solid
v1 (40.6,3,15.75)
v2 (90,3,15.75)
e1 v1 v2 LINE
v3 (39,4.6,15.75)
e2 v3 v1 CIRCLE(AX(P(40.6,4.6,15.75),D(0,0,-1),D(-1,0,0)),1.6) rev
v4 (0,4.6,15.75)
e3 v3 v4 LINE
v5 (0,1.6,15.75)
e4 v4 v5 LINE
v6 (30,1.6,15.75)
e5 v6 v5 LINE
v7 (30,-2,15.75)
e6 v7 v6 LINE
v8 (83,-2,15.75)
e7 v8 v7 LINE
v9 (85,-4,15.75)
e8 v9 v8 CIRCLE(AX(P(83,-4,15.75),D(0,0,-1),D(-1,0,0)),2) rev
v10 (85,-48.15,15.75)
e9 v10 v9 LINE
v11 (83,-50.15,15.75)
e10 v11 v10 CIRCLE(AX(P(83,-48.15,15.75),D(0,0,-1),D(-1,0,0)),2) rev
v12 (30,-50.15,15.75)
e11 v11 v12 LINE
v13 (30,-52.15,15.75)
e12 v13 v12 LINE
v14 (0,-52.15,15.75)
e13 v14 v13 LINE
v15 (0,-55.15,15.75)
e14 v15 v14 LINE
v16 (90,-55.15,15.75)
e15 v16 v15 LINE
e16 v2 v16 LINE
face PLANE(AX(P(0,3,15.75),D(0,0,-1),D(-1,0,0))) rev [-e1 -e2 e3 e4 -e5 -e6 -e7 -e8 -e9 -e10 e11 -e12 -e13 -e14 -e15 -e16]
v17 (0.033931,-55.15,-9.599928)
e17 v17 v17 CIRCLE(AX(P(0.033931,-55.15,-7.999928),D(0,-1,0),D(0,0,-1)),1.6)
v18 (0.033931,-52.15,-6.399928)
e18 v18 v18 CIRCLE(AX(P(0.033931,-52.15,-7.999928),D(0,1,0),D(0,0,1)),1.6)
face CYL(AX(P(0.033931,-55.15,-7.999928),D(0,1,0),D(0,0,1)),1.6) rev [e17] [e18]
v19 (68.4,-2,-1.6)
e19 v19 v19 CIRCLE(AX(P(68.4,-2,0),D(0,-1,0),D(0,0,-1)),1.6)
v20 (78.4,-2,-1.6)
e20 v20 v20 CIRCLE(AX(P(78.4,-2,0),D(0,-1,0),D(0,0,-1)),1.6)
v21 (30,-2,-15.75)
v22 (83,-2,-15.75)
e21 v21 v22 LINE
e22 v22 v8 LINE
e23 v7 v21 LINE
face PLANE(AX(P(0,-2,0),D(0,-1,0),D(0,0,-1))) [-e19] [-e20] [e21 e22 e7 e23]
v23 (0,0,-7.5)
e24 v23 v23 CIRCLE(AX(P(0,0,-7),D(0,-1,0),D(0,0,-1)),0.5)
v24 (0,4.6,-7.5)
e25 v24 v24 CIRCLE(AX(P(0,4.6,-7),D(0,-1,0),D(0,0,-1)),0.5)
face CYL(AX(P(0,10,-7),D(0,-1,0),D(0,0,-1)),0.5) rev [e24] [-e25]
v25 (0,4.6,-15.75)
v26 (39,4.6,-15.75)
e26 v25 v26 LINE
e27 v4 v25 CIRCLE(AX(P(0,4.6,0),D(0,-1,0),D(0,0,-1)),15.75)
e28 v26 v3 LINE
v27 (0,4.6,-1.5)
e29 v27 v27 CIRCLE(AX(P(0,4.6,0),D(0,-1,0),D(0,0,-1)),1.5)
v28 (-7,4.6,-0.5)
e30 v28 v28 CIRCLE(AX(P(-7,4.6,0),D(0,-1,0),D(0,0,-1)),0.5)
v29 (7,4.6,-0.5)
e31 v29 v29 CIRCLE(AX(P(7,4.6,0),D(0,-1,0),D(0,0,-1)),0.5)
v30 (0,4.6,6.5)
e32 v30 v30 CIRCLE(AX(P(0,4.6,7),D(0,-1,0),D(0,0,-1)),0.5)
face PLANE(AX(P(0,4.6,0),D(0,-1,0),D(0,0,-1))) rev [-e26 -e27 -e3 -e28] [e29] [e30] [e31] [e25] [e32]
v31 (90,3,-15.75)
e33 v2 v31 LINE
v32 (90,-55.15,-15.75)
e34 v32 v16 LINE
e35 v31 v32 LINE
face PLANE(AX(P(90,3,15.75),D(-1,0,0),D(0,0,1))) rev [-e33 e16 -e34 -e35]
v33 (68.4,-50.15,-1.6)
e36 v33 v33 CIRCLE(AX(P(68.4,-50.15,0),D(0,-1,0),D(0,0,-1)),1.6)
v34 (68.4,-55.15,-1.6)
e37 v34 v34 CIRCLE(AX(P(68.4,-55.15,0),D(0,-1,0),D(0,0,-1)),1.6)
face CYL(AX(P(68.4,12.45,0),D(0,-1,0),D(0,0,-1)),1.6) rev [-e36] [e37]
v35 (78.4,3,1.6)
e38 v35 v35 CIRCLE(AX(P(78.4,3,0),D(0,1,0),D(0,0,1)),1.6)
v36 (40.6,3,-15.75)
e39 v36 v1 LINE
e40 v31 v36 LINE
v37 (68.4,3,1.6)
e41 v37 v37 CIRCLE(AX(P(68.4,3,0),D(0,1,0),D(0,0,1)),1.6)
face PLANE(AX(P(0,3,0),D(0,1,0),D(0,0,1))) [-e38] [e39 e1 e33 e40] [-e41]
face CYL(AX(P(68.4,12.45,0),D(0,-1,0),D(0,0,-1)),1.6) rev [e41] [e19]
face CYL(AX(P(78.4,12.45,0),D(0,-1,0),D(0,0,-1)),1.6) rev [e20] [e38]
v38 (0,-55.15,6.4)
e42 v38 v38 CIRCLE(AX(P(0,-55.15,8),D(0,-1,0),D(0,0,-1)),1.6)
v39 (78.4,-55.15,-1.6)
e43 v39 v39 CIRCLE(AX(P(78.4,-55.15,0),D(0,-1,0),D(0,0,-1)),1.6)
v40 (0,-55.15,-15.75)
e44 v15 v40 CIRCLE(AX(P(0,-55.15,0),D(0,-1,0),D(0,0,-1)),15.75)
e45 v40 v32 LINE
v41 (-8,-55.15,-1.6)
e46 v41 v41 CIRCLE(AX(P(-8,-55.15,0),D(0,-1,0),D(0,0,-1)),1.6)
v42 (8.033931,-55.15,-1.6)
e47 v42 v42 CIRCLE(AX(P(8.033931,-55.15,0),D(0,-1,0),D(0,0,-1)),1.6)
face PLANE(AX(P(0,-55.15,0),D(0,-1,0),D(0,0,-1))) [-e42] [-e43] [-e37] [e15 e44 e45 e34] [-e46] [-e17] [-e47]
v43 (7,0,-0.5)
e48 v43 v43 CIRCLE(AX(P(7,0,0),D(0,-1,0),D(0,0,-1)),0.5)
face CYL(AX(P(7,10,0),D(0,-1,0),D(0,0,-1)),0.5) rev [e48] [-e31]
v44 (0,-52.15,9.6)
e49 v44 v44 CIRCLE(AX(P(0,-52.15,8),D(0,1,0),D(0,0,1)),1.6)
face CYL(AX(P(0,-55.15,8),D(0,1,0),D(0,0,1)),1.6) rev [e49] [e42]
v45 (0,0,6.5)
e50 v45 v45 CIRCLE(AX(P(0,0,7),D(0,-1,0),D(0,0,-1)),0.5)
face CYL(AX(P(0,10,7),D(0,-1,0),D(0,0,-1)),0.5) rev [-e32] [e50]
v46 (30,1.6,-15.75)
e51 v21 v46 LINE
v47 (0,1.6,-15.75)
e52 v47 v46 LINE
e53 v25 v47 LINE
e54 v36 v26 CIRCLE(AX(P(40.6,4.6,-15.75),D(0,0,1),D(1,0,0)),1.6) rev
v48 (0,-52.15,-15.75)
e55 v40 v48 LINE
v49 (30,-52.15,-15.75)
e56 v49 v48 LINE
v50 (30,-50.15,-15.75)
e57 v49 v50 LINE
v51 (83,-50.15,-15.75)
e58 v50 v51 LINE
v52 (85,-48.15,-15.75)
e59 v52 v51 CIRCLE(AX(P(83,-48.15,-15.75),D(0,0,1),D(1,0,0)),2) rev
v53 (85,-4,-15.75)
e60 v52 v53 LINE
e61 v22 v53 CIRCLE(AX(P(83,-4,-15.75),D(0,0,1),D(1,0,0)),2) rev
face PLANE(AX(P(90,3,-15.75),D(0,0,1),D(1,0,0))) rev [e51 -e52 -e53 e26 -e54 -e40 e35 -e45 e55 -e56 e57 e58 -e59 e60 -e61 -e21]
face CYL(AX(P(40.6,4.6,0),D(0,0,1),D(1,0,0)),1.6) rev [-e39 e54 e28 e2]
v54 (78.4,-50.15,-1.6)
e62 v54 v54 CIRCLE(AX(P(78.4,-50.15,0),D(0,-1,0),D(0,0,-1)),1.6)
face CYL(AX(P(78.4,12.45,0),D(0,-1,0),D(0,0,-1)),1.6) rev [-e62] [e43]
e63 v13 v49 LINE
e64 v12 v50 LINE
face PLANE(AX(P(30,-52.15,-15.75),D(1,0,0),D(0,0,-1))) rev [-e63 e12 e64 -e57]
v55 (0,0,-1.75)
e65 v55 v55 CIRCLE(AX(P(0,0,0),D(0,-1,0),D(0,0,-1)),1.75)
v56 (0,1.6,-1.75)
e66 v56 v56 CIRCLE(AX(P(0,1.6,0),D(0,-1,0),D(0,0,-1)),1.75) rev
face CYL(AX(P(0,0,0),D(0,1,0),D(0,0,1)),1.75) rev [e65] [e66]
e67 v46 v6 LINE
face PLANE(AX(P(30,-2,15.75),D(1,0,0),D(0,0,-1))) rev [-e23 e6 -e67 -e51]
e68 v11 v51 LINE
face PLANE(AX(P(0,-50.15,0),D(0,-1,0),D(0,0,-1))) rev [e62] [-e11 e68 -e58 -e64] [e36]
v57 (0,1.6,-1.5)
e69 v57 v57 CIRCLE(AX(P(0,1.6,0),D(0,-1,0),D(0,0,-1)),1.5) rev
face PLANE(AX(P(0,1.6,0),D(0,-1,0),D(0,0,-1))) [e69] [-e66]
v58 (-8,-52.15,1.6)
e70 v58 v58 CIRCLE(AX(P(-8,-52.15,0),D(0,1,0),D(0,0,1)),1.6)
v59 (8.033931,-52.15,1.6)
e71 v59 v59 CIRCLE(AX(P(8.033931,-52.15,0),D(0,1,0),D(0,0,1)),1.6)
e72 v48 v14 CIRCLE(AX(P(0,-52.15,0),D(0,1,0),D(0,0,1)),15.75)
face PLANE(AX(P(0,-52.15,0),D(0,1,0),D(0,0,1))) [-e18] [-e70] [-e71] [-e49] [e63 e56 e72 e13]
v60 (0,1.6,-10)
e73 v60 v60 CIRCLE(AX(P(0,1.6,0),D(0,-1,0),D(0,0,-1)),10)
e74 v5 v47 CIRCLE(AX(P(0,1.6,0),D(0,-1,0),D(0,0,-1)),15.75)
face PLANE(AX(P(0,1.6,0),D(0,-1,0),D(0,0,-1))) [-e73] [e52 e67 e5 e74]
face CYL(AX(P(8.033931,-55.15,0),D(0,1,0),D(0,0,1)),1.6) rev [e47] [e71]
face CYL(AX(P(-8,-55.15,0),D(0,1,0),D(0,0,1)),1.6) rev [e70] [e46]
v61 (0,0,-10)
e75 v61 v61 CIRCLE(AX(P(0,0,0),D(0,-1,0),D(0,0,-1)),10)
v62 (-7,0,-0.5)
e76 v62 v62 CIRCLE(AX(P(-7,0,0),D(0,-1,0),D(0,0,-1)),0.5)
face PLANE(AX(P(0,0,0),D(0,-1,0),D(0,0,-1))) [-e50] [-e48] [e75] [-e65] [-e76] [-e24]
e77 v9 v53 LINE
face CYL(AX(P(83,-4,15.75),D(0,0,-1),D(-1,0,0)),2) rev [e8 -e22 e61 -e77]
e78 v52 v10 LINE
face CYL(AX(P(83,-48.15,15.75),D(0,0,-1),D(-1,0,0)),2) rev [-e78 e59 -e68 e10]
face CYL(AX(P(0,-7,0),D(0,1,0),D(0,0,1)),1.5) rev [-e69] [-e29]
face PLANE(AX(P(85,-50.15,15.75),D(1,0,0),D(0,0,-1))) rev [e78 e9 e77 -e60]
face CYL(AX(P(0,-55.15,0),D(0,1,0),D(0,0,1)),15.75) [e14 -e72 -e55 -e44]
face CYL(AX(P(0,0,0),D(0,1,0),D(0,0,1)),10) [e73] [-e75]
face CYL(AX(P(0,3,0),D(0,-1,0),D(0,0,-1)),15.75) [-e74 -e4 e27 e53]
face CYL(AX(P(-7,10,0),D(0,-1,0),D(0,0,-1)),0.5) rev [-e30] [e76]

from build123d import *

# Parameters (mm, degrees)
EXTRUDE_1_DEPTH     = 3
SKETCH_3_W          = 60
SKETCH_3_H          = 31.5
EXTRUDE_2_DEPTH     = 2
SKETCH_4_R          = 0.5
CUT_EXTRUDE_1_DEPTH = 10
SKETCH_5_R          = 1.5
CUT_EXTRUDE_2_DEPTH = 10
SKETCH_6_W          = 5
SKETCH_6_H          = 31.5
EXTRUDE_3_DEPTH     = 48.15
EXTRUDE_START       = 5
SKETCH_7_R          = 1.6
EXTRUDE_4_DEPTH     = 5
CUT_EXTRUDE_3_DEPTH = 2
FILLET_1_R          = 2
FILLET_2_R          = 2
CUT_EXTRUDE_5_DEPTH = 1.6
SKETCH_11_R         = 0.5
SKETCH_11_R_2       = 1.5
EXTRUDE_5_DEPTH     = 3
SKETCH_12_W         = 31.5
SKETCH_12_H         = 1.6
EXTRUDE_6_DEPTH     = 9
FILLET_4_R          = 1.6
EXTRUDE_START_2     = 1.6
SKETCH_13_R         = 10
SKETCH_13_R_2       = 1.75
SKETCH_13_R_3       = 0.5
EXTRUDE_7_DEPTH     = 1.6
SKETCH_14_R         = 1.6
CUT_EXTRUDE_6_DEPTH = 67.6


with BuildPart() as part:
    # 草图1 → 凸台-拉伸1 (new body)
    with BuildSketch(Plane(origin=(0, 0, 0), x_dir=(1, 0, 0), z_dir=(0, 1, 0))):
        with BuildLine():
            Line((0, -15.75), (90, -15.75))
            Line((90, -15.75), (90, 15.75))
            Line((90, 15.75), (0, 15.75))
            ThreePointArc((0, 15.75), (-15.75, 0), (0, -15.75))
        make_face()
    extrude(amount=EXTRUDE_1_DEPTH)

    # 草图3 → 凸台-拉伸2 (add)
    with BuildSketch(Plane.XZ):
        with Locations((60, 0)):
            Rectangle(SKETCH_3_W, SKETCH_3_H)
    extrude(amount=EXTRUDE_2_DEPTH)

    # 草图4 → 切除-拉伸1 (cut)
    with BuildSketch(Plane.XZ):
        with Locations(Location((0, 7, 0), (0, 0, 270))):
            Circle(SKETCH_4_R)
        with Locations(Location((7, 0, 0), (0, 0, 270))):
            Circle(SKETCH_4_R)
        with Locations(Location((0, -7, 0), (0, 0, 270))):
            Circle(SKETCH_4_R)
        with Locations(Location((-7, 0, 0), (0, 0, 270))):
            Circle(SKETCH_4_R)
    extrude(amount=-CUT_EXTRUDE_1_DEPTH, mode=Mode.SUBTRACT)

    # 草图5 → 切除-拉伸2 (cut)
    with BuildSketch(Plane(origin=(0, 3, 0), x_dir=(1, 0, 0), z_dir=(0, 1, 0))):
        with Locations(Location((0, 0, 0), (0, 0, 270))):
            Circle(SKETCH_5_R)
    extrude(amount=-CUT_EXTRUDE_2_DEPTH, mode=Mode.SUBTRACT)

    # 草图6 → 凸台-拉伸3 (add)
    with BuildSketch(Plane.XZ.offset(2)):
        with Locations((87.5, 0)):
            Rectangle(SKETCH_6_W, SKETCH_6_H)
    extrude(amount=EXTRUDE_3_DEPTH)

    # 草图7 → 凸台-拉伸4 (add)
    with BuildSketch(Plane.XZ.offset(50.15).offset(EXTRUDE_START)):
        with BuildLine():
            Line((90, 15.75), (0, 15.75))
            ThreePointArc((0, 15.75), (-15.75, 0), (0, -15.75))
            Line((0, -15.75), (90, -15.75))
            Line((90, -15.75), (90, 15.75))
        make_face()
        with Locations(Location((8.03393099, 0, 0), (0, 0, 270))):
            Circle(SKETCH_7_R, mode=Mode.SUBTRACT)
        with Locations(Location((0, 8, 0), (0, 0, 270))):
            Circle(SKETCH_7_R, mode=Mode.SUBTRACT)
        with Locations(Location((0.03393099, -7.999928043, 0), (0, 0, 270))):
            Circle(SKETCH_7_R, mode=Mode.SUBTRACT)
        with Locations(Location((-8, 0, 0), (0, 0, 270))):
            Circle(SKETCH_7_R, mode=Mode.SUBTRACT)
    extrude(amount=-EXTRUDE_4_DEPTH)

    # 草图8 → 切除-拉伸3 (cut)
    with BuildSketch(Plane(origin=(0, -50.15, 0), x_dir=(1, 0, 0), z_dir=(0, 1, 0))):
        Polygon((0, 15.75), (30, 15.75), (30, -15.75), (0, -15.75), (-20, -15.75), (-20, 15.75), align=None)
    extrude(amount=-CUT_EXTRUDE_3_DEPTH, mode=Mode.SUBTRACT)

    # 圆角1
    fillet_1_edges = [part.edges().sort_by_distance(p)[0] for p in [
        (85, -2, 0),
    ]]
    fillet(fillet_1_edges, radius=FILLET_1_R)

    # 圆角2
    fillet_2_edges = [part.edges().sort_by_distance(p)[0] for p in [
        (85, -50.15, 0),
    ]]
    fillet(fillet_2_edges, radius=FILLET_2_R)

    # 草图10 → 切除-拉伸5 (cut)
    with BuildSketch(Plane.XZ):
        with BuildLine():
            Line((30, -15.75), (30, 15.75))
            Line((30, 15.75), (0, 15.75))
            ThreePointArc((0, 15.75), (-15.75, 0), (0, -15.75))
            Line((0, -15.75), (30, -15.75))
        make_face()
    extrude(amount=-CUT_EXTRUDE_5_DEPTH, mode=Mode.SUBTRACT)

    # 草图11 → 凸台-拉伸5 (add)
    with BuildSketch(Plane.XZ.offset(-1.6)):
        with BuildLine():
            Line((0, -15.75), (30, -15.75))
            Line((30, -15.75), (30, 15.75))
            Line((30, 15.75), (0, 15.75))
            ThreePointArc((0, 15.75), (-15.75, 0), (0, -15.75))
        make_face()
        with Locations(Location((0, -7, 0), (0, 0, 270))):
            Circle(SKETCH_11_R, mode=Mode.SUBTRACT)
        with Locations(Location((-7, 0, 0), (0, 0, 270))):
            Circle(SKETCH_11_R, mode=Mode.SUBTRACT)
        with Locations(Location((0, 0, 0), (0, 0, 270))):
            Circle(SKETCH_11_R_2, mode=Mode.SUBTRACT)
        with Locations(Location((0, 7, 0), (0, 0, 270))):
            Circle(SKETCH_11_R, mode=Mode.SUBTRACT)
        with Locations(Location((7, 0, 0), (0, 0, 270))):
            Circle(SKETCH_11_R, mode=Mode.SUBTRACT)
    extrude(amount=-EXTRUDE_5_DEPTH)

    # 草图12 → 凸台-拉伸6 (add)
    with BuildSketch(Plane(origin=(30, 0, 0), x_dir=(0, 0, -1), z_dir=(1, 0, 0))):
        with Locations((0, 3.8)):
            Rectangle(SKETCH_12_W, SKETCH_12_H)
    extrude(amount=EXTRUDE_6_DEPTH)

    # 圆角4
    fillet_4_edges = [part.edges().sort_by_distance(p)[0] for p in [
        (39, 3, 0),
    ]]
    fillet(fillet_4_edges, radius=FILLET_4_R - 0.0001)  # a hair under: the kernel refuses the full size

    # 草图13 → 凸台-拉伸7 (add)
    with BuildSketch(Plane.XZ.offset(-1.6).offset(EXTRUDE_START_2)):
        with Locations(Location((0, 0, 0), (0, 0, 270))):
            Circle(SKETCH_13_R)
        with Locations(Location((0, 0, 0), (0, 0, 270))):
            Circle(SKETCH_13_R_2, mode=Mode.SUBTRACT)
        with Locations(Location((7, 0, 0), (0, 0, 270))):
            Circle(SKETCH_13_R_3, mode=Mode.SUBTRACT)
        with Locations(Location((0, -7, 0), (0, 0, 270))):
            Circle(SKETCH_13_R_3, mode=Mode.SUBTRACT)
        with Locations(Location((-7, 0, 0), (0, 0, 270))):
            Circle(SKETCH_13_R_3, mode=Mode.SUBTRACT)
        with Locations(Location((0, 7, 0), (0, 0, 270))):
            Circle(SKETCH_13_R_3, mode=Mode.SUBTRACT)
    extrude(amount=-EXTRUDE_7_DEPTH)

    # 草图14 → 切除-拉伸6 (cut)
    with BuildSketch(Plane.XZ.offset(55.15)):
        with Locations(Location((68.4, 0, 0), (0, 0, 270))):
            Circle(SKETCH_14_R)
        with Locations(Location((78.4, 0, 0), (0, 0, 270))):
            Circle(SKETCH_14_R)
    extrude(amount=-CUT_EXTRUDE_6_DEPTH, mode=Mode.SUBTRACT)


solid = part.part
